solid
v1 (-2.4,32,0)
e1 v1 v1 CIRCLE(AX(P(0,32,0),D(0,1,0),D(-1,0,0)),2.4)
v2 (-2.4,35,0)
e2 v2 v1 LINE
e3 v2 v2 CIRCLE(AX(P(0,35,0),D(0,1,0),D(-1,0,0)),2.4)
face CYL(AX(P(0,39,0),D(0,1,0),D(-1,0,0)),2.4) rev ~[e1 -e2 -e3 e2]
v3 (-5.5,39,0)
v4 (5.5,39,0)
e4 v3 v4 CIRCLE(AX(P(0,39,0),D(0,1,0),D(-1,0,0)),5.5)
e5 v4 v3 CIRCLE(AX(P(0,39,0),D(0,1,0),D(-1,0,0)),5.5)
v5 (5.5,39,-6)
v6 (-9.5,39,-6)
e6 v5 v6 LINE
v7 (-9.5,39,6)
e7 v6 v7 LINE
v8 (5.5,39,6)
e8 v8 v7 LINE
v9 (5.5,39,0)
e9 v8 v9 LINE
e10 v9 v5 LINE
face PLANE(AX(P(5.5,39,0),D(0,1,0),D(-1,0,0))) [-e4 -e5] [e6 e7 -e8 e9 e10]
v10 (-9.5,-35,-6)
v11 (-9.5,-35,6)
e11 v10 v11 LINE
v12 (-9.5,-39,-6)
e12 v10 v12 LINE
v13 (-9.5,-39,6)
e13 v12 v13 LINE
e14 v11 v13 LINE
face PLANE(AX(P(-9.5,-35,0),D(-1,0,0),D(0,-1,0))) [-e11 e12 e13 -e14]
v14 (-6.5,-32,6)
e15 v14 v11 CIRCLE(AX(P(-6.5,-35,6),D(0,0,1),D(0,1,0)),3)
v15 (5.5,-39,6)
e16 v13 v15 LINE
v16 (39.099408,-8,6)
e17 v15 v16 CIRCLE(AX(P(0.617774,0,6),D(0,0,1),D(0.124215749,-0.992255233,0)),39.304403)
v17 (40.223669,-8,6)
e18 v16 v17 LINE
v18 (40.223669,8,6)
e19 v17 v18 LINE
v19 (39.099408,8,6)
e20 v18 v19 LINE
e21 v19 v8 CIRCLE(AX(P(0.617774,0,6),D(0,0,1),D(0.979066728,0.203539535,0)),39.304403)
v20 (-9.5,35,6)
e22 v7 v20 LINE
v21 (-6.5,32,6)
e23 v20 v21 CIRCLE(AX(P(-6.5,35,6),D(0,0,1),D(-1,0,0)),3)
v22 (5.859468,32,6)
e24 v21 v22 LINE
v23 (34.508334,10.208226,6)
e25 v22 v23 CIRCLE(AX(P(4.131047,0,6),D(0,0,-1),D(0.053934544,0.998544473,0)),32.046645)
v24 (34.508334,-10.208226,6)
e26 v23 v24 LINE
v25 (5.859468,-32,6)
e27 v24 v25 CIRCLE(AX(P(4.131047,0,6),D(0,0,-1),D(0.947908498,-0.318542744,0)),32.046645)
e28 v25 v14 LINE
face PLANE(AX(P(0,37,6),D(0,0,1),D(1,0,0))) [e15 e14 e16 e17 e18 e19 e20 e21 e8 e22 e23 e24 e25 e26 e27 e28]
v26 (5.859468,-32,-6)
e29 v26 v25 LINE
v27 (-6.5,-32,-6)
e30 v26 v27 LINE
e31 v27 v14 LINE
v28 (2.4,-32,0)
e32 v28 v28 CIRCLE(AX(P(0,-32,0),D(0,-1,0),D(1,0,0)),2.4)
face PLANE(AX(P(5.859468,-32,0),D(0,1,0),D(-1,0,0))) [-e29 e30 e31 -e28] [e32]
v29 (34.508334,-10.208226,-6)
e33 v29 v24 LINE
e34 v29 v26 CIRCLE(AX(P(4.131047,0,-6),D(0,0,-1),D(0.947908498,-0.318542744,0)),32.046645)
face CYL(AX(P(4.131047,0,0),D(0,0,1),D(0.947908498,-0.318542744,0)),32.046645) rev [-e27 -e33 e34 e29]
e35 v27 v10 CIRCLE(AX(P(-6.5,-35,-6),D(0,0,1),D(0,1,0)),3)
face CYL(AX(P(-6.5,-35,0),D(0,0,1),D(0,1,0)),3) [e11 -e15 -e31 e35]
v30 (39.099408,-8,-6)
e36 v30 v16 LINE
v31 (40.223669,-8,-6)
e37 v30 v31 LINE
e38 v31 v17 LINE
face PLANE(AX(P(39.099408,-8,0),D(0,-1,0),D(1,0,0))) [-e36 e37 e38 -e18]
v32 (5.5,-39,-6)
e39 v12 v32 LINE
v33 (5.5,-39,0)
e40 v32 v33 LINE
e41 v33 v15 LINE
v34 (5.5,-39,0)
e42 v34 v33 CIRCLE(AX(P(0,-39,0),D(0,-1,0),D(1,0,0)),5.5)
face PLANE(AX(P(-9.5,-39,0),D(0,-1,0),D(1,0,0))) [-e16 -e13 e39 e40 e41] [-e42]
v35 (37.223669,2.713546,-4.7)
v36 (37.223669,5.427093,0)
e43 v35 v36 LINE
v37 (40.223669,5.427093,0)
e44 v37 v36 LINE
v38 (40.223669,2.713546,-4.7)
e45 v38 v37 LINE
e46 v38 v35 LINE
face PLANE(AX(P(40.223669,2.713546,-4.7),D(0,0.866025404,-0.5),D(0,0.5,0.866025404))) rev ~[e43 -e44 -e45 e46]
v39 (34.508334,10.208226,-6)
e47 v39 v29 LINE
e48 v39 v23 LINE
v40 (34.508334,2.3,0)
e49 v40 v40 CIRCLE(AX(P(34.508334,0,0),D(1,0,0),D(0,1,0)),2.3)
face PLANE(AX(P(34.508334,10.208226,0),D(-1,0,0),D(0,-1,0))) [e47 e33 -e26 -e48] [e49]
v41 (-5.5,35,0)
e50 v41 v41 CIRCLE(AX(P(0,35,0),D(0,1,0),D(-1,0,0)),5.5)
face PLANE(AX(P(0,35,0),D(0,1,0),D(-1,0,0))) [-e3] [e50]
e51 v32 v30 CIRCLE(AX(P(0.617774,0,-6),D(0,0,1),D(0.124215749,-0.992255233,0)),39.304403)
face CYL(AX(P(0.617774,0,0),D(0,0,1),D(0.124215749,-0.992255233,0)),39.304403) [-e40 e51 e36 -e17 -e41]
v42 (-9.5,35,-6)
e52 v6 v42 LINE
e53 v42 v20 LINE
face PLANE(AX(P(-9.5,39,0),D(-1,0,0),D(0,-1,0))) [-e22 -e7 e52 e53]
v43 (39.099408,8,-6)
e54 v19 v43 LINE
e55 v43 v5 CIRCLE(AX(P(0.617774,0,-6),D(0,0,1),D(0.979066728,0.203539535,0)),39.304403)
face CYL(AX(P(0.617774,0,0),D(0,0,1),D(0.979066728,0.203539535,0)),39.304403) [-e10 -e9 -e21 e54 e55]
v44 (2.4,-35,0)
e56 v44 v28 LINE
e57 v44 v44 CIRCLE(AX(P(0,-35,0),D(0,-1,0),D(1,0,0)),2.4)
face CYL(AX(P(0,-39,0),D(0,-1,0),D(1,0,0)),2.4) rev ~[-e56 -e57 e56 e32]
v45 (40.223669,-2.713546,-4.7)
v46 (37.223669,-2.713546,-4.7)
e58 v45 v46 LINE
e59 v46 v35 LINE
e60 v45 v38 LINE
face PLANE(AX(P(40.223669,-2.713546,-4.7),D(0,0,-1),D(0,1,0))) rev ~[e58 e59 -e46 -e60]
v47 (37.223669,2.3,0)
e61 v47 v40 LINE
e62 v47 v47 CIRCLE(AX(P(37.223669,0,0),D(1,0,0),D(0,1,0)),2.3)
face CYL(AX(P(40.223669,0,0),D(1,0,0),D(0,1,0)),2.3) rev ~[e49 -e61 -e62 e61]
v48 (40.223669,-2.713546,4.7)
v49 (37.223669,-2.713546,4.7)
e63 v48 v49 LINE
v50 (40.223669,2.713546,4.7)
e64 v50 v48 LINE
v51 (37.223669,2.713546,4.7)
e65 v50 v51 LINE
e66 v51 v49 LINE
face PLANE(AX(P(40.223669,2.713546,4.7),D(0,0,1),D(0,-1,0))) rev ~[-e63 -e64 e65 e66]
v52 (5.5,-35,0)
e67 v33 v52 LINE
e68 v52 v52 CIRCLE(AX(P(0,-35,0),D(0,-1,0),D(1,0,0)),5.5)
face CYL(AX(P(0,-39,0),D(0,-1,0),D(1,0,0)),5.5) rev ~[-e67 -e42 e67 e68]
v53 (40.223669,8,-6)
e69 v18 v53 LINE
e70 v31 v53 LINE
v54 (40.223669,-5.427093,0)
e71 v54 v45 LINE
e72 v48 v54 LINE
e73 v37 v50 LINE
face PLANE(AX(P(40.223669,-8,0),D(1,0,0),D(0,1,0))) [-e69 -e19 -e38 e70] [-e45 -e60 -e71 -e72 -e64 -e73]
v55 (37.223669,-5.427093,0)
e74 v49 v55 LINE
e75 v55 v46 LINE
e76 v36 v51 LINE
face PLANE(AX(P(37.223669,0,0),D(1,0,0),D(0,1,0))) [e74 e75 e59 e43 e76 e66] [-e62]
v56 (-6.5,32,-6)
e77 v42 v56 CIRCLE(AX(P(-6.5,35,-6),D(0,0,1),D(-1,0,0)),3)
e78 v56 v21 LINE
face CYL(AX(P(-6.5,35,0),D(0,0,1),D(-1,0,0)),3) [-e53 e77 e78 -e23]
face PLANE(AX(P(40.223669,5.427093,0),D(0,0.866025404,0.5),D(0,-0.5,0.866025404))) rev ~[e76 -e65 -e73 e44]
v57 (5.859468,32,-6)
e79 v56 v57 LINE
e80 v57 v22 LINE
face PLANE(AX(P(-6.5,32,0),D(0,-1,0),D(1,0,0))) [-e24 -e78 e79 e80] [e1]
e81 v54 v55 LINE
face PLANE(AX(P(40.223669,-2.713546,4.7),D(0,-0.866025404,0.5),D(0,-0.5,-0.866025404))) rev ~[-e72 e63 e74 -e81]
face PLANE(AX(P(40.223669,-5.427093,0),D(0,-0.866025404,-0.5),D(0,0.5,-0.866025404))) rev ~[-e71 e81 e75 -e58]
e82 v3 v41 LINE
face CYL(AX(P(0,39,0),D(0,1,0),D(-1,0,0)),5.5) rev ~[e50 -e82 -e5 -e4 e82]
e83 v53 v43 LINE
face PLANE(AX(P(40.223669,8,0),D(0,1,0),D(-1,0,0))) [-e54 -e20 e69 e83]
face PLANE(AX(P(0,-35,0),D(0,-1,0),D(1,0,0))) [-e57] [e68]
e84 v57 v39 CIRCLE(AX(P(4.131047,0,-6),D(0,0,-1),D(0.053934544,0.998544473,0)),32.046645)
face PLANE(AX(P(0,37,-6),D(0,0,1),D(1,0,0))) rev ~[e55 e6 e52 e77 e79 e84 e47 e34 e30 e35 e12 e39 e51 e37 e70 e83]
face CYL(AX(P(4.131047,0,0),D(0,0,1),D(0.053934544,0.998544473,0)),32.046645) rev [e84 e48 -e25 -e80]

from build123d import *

# Parameters (mm, degrees)
F0_W          = 11
F0_H          = 4
F1_DEPTH      = 6
F1_DEPTH_BACK = 6
F2_R          = 5.5
F2_R_2        = 2.4
F3_DEPTH      = 4
F4_DEPTH      = 10.8
F5_R          = 2.4
F6_DEPTH      = 4
F7_DEPTH      = 10
F8_R          = 2.3
F9_DEPTH      = 3
F10_DEPTH     = 14


# Not quite as in the source:
# - a feature names something its author has since deleted; it is built from what else it names


with BuildPart() as f1:
    # F0 (on Top) → F1 (new body, two sides)
    with BuildSketch(Plane.XY) as f1_sk:
        with Locations((0, 37)):
            Rectangle(F0_W, F0_H)
        with BuildLine():
            ThreePointArc((-9.5, 35), (-8.6213203436, 32.8786796564), (-6.5, 32))
            Line((-6.5, 32), (5.8594679956, 32))
            ThreePointArc((5.8594679956, 32), (23.5324507486, 25.5063318649), (34.5083337044, 10.2082261463))
            Line((34.5083337044, 10.2082261463), (34.5083337044, -10.2082261463))
            ThreePointArc((34.5083337044, -10.2082261463), (23.5324507486, -25.5063318649), (5.8594679956, -32))
            Line((5.8594679956, -32), (-6.5, -32))
            ThreePointArc((-6.5, -32), (-8.6213203436, -32.8786796564), (-9.5, -35))
            Line((-9.5, -35), (-9.5, -39))
            Line((-9.5, -39), (-5.5, -39))
            Line((-5.5, -39), (-5.5, -35))
            Line((-5.5, -35), (5.5, -35))
            Line((5.5, -35), (5.5, -39))
            ThreePointArc((5.5, -39), (27.2702801405, -28.8873683489), (39.0994077402, -8))
            Line((39.0994077402, -8), (40.2236692607, -8))
            Line((40.2236692607, -8), (40.2236692607, 8))
            Line((40.2236692607, 8), (39.0994077402, 8))
            ThreePointArc((39.0994077402, 8), (27.2702801405, 28.8873683489), (5.5, 39))
            Line((5.5, 39), (5.5, 35))
            Line((5.5, 35), (-5.5, 35))
            Line((-5.5, 35), (-5.5, 39))
            Line((-5.5, 39), (-9.5, 39))
            Line((-9.5, 39), (-9.5, 35))
        make_face()
        with Locations((0, -37)):
            Rectangle(F0_W, F0_H)
    extrude(amount=F1_DEPTH)
    extrude(f1_sk.sketch, amount=-F1_DEPTH_BACK)

    # F2 (on face) → F3 (cut)
    with BuildSketch(Plane.XZ.offset(39)):
        Circle(F2_R)
        Circle(F2_R_2, mode=Mode.SUBTRACT)
    extrude(amount=-F3_DEPTH, mode=Mode.SUBTRACT)

    # F4 (cut): a face of the model
    f4_faces = [f1.faces().sort_by_distance(p)[0] for p in [
        (0, -39, 0),
    ]]
    extrude(f4_faces, amount=-F4_DEPTH, mode=Mode.SUBTRACT)

    # F5 (on face) → F6 (cut)
    with BuildSketch(Plane(origin=(0, 39, 0), x_dir=(-1, 0, 0), z_dir=(0, 1, 0))):
        with BuildLine():
            ThreePointArc((-5.5, 3.96e-08), (-1.98e-08, -5.5), (5.5, 0))
            ThreePointArc((5.5, 0), (1.98e-08, 5.5), (-5.5, 3.96e-08))
        make_face()
        Circle(F5_R, mode=Mode.SUBTRACT)
    extrude(amount=-F6_DEPTH, mode=Mode.SUBTRACT)

    # F7 (cut): a face of the model
    f7_faces = [f1.faces().sort_by_distance(p)[0] for p in [
        (0, 39, 0),
    ]]
    extrude(f7_faces, amount=-F7_DEPTH, mode=Mode.SUBTRACT)

    # F8 (on face) → F9 (cut)
    with BuildSketch(Plane.YZ.offset(40.2236692607)):
        Polygon((2.7135462652, -4.7), (5.4270925304, 0), (2.7135462652, 4.7), (-2.7135462652, 4.7), (-5.4270925304, 0), (-2.7135462652, -4.7), align=None)
        Circle(F8_R, mode=Mode.SUBTRACT)
    extrude(amount=-F9_DEPTH, mode=Mode.SUBTRACT)

    # F10 (cut): a face of the model
    f10_faces = [f1.faces().sort_by_distance(p)[0] for p in [
        (40.2236692607, 0, 0),
    ]]
    extrude(f10_faces, amount=-F10_DEPTH, mode=Mode.SUBTRACT)


solid = f1.part
